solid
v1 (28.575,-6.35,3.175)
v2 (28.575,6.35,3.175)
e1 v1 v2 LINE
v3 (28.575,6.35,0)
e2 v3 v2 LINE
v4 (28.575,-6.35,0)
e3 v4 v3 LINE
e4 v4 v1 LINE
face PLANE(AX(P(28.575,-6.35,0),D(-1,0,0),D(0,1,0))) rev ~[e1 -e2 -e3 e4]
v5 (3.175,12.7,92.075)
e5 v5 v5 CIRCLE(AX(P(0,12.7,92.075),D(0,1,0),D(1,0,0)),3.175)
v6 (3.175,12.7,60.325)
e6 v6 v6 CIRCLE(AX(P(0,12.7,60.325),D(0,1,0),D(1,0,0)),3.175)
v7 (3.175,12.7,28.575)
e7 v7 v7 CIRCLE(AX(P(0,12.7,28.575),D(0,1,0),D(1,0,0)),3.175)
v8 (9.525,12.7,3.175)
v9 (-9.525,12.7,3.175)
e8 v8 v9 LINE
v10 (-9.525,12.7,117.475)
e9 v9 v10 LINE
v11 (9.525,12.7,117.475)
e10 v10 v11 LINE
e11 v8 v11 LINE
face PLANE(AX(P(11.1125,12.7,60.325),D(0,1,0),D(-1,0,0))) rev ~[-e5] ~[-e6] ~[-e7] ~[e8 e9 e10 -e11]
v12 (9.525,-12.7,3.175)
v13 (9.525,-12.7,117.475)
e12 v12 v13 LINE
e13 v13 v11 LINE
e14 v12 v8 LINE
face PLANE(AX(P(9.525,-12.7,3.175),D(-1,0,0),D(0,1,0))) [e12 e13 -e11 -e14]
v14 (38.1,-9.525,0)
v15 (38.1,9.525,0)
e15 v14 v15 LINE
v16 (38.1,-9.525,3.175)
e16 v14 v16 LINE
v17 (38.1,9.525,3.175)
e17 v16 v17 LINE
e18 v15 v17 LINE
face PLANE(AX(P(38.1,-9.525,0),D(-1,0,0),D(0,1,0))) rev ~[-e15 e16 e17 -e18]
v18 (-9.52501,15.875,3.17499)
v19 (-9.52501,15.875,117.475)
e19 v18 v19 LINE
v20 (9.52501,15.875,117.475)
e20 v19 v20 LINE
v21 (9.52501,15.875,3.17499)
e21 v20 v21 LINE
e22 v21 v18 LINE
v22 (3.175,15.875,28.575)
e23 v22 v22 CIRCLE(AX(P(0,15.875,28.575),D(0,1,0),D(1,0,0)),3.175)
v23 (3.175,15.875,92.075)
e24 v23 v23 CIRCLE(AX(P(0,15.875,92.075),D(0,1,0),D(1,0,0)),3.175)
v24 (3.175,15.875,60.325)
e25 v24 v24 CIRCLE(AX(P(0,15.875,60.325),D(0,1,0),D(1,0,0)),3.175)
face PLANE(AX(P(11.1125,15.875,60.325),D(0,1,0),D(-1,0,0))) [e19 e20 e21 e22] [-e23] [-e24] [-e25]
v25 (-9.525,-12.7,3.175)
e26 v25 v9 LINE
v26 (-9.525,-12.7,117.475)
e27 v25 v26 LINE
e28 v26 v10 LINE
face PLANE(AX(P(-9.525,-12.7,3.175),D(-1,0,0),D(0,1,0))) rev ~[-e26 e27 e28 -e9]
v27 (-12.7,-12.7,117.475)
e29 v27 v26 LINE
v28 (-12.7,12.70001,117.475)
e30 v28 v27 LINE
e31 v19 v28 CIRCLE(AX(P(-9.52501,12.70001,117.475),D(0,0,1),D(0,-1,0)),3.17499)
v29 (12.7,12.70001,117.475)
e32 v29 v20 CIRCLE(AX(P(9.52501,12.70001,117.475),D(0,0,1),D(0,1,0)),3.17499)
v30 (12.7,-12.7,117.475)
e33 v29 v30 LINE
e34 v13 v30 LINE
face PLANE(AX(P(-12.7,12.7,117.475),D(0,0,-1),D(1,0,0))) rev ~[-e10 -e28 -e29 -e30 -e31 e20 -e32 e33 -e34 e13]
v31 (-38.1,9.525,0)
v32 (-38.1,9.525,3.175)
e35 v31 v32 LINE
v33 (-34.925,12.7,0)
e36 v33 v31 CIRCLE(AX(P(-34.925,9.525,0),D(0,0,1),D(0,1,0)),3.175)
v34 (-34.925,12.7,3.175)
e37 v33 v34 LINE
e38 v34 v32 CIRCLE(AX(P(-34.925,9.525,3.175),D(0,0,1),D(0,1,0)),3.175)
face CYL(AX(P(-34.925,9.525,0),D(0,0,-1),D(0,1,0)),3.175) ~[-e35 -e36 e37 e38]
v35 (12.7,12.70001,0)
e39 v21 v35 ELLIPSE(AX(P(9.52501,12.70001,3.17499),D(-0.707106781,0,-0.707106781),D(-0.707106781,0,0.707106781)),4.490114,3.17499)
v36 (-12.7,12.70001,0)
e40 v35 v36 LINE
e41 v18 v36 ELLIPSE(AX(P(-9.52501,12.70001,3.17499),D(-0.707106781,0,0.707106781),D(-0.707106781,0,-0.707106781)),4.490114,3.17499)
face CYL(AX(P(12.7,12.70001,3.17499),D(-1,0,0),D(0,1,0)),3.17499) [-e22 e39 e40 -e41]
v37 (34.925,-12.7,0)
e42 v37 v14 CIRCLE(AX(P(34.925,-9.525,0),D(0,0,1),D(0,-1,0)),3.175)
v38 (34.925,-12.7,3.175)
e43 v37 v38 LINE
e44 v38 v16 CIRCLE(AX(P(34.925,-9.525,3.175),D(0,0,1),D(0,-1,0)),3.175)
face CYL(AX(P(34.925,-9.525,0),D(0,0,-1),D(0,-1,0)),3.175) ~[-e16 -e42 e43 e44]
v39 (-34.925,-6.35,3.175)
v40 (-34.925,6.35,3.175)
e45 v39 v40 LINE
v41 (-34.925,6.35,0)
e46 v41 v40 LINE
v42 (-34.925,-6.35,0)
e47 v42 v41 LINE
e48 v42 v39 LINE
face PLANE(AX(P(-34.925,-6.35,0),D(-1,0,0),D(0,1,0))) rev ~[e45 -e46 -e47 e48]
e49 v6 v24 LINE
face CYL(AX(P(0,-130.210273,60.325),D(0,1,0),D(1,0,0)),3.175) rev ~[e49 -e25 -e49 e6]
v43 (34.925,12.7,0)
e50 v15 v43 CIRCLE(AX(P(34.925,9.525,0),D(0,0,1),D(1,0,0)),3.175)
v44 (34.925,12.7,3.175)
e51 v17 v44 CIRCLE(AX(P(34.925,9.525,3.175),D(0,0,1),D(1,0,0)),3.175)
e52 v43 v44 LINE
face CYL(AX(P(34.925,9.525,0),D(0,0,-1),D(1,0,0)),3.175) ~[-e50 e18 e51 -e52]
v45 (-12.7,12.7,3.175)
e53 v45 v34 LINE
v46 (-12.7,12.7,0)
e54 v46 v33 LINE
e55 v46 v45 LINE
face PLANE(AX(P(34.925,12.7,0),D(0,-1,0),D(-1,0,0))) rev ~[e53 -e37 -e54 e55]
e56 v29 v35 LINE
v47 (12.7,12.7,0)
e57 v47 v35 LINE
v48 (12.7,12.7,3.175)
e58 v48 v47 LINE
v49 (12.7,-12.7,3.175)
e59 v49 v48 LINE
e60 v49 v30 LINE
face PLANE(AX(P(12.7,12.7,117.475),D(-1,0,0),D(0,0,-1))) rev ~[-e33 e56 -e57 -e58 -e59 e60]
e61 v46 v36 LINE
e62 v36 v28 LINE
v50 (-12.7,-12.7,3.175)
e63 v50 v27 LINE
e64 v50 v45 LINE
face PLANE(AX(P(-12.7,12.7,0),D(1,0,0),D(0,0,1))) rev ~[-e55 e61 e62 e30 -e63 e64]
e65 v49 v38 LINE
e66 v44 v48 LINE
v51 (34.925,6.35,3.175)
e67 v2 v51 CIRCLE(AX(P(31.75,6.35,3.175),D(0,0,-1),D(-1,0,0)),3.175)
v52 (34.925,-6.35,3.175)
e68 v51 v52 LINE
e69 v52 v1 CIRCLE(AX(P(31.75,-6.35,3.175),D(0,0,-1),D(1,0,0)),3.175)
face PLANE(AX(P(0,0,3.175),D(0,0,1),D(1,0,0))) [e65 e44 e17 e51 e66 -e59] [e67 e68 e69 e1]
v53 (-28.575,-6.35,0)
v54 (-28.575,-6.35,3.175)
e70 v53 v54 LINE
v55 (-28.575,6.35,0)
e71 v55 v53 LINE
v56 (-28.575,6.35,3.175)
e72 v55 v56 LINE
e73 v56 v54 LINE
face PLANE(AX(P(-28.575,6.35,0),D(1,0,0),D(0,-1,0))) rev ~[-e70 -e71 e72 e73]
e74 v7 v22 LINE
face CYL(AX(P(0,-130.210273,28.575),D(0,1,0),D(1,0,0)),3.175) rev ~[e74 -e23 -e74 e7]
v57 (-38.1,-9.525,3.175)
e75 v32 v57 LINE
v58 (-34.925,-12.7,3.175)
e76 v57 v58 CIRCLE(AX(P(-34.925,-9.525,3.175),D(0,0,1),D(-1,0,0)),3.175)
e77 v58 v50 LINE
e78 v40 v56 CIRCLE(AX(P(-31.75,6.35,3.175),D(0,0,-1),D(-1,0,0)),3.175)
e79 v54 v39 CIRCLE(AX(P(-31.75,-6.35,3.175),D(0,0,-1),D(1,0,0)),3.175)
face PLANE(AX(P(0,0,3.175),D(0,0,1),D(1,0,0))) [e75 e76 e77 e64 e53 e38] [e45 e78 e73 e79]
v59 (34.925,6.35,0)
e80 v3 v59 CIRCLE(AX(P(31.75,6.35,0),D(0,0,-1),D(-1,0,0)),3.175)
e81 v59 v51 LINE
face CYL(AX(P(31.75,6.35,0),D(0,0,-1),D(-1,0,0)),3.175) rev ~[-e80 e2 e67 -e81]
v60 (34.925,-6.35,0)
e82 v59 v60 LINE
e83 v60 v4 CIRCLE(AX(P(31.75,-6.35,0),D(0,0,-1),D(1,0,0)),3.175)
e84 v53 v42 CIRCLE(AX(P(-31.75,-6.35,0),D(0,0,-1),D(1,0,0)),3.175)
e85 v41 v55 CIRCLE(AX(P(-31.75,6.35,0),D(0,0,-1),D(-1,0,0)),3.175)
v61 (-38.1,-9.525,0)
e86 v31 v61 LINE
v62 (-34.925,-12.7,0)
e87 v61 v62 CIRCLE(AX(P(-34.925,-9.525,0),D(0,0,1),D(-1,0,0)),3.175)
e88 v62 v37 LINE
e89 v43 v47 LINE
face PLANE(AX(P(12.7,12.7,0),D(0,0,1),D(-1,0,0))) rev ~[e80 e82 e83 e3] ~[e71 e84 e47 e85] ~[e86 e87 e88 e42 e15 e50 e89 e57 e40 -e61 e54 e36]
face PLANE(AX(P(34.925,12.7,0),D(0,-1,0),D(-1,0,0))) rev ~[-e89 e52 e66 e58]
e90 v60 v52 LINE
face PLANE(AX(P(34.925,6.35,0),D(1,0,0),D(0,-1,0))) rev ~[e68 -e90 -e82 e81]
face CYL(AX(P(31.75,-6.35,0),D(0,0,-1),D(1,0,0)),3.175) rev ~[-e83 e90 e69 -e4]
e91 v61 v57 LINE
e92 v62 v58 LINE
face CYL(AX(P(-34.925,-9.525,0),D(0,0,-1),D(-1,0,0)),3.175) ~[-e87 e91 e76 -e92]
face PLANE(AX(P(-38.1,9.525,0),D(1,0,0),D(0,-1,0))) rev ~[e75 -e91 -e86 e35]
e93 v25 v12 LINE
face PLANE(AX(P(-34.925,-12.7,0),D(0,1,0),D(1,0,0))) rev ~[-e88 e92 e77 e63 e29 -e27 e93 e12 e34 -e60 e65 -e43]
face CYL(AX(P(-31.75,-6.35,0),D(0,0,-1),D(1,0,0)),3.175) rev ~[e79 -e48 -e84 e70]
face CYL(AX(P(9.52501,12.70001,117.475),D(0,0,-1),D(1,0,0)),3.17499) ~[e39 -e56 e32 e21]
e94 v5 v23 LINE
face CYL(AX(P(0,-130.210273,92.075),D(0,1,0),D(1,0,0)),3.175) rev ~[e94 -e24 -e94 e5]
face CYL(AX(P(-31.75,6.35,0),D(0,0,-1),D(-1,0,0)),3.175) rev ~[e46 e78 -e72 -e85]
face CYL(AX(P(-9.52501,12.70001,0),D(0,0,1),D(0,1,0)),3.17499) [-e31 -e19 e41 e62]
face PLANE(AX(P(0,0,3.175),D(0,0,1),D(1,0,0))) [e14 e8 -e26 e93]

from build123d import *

# Parameters (mm, degrees)
F1_DEPTH = 3.175
F2_W     = 3.175
F2_H     = 25.4
F3_DEPTH = 114.3
F4_W     = 3.175
F4_H     = 114.3
F4_W_2   = 19.05
F4_H_2   = 3.175
F5_DEPTH = 3.175
F6_D     = 6.35
F7_R     = 3.17499


# Not quite as in the source:
# - a fillet or chamfer is up to 0.001 mm smaller than in the source, because OpenCascade refuses the exact size


with BuildPart() as f1:
    # F0 (on Top) → F1 (new body)
    with BuildSketch(Plane.XY):
        with BuildLine():
            Line((34.925, 12.7), (-34.925, 12.7))
            ThreePointArc((-34.925, 12.7), (-37.1700640303, 11.7700640303), (-38.1, 9.525))
            Line((-38.1, 9.525), (-38.1, -9.525))
            ThreePointArc((-38.1, -9.525), (-37.1700640303, -11.7700640303), (-34.925, -12.7))
            Line((-34.925, -12.7), (34.925, -12.7))
            ThreePointArc((34.925, -12.7), (37.1700640303, -11.7700640303), (38.1, -9.525))
            Line((38.1, -9.525), (38.1, 9.525))
            ThreePointArc((38.1, 9.525), (37.1700640303, 11.7700640303), (34.925, 12.7))
        make_face()
        with BuildLine():
            Line((-34.925, -6.35), (-34.925, 6.35))
            ThreePointArc((-34.925, 6.35), (-31.75, 9.525), (-28.575, 6.35))
            Line((-28.575, 6.35), (-28.575, -6.35))
            ThreePointArc((-28.575, -6.35), (-31.75, -9.525), (-34.925, -6.35))
        make_face(mode=Mode.SUBTRACT)
        with BuildLine():
            Line((28.575, -6.35), (28.575, 6.35))
            ThreePointArc((28.575, 6.35), (31.75, 9.525), (34.925, 6.35))
            Line((34.925, 6.35), (34.925, -6.35))
            ThreePointArc((34.925, -6.35), (31.75, -9.525), (28.575, -6.35))
        make_face(mode=Mode.SUBTRACT)
    extrude(amount=F1_DEPTH)

    # F2 (on face) → F3 (join)
    with BuildSketch(Plane.XY.offset(3.175)):
        with Locations((11.1125, 0)):
            Rectangle(F2_W, F2_H)
        with Locations((-11.1125, 0)):
            Rectangle(F2_W, F2_H)
    extrude(amount=F3_DEPTH)

    # F4 (on face) → F5 (join)
    with BuildSketch(Plane(origin=(0, 12.7, 0), x_dir=(-1, 0, 0), z_dir=(0, 1, 0))):
        with Locations((-11.1125, 60.325)):
            Rectangle(F4_W, F4_H)
        with Locations((0, 60.325)):
            Rectangle(F4_W_2, F4_H)
        with Locations((11.1125, 60.325)):
            Rectangle(F4_W, F4_H)
        with Locations((0, 1.5875)):
            Rectangle(F4_W_2, F4_H_2)
        with Locations((-11.1125, 1.5875)):
            Rectangle(F4_W, F4_H_2)
        with Locations((11.1125, 1.5875)):
            Rectangle(F4_W, F4_H_2)
    extrude(amount=F5_DEPTH)

    # F6 (through all)
    with Locations(Plane(origin=(0, 12.7, 0), x_dir=(-1, 0, 0), z_dir=(0, -1, 0))):
        with Locations((0, -28.575), (0, -60.325), (0, -92.075)):
            Hole(F6_D / 2)

    # F7 (radius 3.175 in the source; OpenCascade refuses exactly that, so slightly less here)
    f7_edges = [f1.edges().sort_by_distance(p)[0] for p in [
        (0, 15.875, 0),
        (12.7, 15.875, 58.7375),
        (-12.7, 15.875, 58.7375),
    ]]
    fillet(f7_edges, radius=F7_R)


solid = f1.part
